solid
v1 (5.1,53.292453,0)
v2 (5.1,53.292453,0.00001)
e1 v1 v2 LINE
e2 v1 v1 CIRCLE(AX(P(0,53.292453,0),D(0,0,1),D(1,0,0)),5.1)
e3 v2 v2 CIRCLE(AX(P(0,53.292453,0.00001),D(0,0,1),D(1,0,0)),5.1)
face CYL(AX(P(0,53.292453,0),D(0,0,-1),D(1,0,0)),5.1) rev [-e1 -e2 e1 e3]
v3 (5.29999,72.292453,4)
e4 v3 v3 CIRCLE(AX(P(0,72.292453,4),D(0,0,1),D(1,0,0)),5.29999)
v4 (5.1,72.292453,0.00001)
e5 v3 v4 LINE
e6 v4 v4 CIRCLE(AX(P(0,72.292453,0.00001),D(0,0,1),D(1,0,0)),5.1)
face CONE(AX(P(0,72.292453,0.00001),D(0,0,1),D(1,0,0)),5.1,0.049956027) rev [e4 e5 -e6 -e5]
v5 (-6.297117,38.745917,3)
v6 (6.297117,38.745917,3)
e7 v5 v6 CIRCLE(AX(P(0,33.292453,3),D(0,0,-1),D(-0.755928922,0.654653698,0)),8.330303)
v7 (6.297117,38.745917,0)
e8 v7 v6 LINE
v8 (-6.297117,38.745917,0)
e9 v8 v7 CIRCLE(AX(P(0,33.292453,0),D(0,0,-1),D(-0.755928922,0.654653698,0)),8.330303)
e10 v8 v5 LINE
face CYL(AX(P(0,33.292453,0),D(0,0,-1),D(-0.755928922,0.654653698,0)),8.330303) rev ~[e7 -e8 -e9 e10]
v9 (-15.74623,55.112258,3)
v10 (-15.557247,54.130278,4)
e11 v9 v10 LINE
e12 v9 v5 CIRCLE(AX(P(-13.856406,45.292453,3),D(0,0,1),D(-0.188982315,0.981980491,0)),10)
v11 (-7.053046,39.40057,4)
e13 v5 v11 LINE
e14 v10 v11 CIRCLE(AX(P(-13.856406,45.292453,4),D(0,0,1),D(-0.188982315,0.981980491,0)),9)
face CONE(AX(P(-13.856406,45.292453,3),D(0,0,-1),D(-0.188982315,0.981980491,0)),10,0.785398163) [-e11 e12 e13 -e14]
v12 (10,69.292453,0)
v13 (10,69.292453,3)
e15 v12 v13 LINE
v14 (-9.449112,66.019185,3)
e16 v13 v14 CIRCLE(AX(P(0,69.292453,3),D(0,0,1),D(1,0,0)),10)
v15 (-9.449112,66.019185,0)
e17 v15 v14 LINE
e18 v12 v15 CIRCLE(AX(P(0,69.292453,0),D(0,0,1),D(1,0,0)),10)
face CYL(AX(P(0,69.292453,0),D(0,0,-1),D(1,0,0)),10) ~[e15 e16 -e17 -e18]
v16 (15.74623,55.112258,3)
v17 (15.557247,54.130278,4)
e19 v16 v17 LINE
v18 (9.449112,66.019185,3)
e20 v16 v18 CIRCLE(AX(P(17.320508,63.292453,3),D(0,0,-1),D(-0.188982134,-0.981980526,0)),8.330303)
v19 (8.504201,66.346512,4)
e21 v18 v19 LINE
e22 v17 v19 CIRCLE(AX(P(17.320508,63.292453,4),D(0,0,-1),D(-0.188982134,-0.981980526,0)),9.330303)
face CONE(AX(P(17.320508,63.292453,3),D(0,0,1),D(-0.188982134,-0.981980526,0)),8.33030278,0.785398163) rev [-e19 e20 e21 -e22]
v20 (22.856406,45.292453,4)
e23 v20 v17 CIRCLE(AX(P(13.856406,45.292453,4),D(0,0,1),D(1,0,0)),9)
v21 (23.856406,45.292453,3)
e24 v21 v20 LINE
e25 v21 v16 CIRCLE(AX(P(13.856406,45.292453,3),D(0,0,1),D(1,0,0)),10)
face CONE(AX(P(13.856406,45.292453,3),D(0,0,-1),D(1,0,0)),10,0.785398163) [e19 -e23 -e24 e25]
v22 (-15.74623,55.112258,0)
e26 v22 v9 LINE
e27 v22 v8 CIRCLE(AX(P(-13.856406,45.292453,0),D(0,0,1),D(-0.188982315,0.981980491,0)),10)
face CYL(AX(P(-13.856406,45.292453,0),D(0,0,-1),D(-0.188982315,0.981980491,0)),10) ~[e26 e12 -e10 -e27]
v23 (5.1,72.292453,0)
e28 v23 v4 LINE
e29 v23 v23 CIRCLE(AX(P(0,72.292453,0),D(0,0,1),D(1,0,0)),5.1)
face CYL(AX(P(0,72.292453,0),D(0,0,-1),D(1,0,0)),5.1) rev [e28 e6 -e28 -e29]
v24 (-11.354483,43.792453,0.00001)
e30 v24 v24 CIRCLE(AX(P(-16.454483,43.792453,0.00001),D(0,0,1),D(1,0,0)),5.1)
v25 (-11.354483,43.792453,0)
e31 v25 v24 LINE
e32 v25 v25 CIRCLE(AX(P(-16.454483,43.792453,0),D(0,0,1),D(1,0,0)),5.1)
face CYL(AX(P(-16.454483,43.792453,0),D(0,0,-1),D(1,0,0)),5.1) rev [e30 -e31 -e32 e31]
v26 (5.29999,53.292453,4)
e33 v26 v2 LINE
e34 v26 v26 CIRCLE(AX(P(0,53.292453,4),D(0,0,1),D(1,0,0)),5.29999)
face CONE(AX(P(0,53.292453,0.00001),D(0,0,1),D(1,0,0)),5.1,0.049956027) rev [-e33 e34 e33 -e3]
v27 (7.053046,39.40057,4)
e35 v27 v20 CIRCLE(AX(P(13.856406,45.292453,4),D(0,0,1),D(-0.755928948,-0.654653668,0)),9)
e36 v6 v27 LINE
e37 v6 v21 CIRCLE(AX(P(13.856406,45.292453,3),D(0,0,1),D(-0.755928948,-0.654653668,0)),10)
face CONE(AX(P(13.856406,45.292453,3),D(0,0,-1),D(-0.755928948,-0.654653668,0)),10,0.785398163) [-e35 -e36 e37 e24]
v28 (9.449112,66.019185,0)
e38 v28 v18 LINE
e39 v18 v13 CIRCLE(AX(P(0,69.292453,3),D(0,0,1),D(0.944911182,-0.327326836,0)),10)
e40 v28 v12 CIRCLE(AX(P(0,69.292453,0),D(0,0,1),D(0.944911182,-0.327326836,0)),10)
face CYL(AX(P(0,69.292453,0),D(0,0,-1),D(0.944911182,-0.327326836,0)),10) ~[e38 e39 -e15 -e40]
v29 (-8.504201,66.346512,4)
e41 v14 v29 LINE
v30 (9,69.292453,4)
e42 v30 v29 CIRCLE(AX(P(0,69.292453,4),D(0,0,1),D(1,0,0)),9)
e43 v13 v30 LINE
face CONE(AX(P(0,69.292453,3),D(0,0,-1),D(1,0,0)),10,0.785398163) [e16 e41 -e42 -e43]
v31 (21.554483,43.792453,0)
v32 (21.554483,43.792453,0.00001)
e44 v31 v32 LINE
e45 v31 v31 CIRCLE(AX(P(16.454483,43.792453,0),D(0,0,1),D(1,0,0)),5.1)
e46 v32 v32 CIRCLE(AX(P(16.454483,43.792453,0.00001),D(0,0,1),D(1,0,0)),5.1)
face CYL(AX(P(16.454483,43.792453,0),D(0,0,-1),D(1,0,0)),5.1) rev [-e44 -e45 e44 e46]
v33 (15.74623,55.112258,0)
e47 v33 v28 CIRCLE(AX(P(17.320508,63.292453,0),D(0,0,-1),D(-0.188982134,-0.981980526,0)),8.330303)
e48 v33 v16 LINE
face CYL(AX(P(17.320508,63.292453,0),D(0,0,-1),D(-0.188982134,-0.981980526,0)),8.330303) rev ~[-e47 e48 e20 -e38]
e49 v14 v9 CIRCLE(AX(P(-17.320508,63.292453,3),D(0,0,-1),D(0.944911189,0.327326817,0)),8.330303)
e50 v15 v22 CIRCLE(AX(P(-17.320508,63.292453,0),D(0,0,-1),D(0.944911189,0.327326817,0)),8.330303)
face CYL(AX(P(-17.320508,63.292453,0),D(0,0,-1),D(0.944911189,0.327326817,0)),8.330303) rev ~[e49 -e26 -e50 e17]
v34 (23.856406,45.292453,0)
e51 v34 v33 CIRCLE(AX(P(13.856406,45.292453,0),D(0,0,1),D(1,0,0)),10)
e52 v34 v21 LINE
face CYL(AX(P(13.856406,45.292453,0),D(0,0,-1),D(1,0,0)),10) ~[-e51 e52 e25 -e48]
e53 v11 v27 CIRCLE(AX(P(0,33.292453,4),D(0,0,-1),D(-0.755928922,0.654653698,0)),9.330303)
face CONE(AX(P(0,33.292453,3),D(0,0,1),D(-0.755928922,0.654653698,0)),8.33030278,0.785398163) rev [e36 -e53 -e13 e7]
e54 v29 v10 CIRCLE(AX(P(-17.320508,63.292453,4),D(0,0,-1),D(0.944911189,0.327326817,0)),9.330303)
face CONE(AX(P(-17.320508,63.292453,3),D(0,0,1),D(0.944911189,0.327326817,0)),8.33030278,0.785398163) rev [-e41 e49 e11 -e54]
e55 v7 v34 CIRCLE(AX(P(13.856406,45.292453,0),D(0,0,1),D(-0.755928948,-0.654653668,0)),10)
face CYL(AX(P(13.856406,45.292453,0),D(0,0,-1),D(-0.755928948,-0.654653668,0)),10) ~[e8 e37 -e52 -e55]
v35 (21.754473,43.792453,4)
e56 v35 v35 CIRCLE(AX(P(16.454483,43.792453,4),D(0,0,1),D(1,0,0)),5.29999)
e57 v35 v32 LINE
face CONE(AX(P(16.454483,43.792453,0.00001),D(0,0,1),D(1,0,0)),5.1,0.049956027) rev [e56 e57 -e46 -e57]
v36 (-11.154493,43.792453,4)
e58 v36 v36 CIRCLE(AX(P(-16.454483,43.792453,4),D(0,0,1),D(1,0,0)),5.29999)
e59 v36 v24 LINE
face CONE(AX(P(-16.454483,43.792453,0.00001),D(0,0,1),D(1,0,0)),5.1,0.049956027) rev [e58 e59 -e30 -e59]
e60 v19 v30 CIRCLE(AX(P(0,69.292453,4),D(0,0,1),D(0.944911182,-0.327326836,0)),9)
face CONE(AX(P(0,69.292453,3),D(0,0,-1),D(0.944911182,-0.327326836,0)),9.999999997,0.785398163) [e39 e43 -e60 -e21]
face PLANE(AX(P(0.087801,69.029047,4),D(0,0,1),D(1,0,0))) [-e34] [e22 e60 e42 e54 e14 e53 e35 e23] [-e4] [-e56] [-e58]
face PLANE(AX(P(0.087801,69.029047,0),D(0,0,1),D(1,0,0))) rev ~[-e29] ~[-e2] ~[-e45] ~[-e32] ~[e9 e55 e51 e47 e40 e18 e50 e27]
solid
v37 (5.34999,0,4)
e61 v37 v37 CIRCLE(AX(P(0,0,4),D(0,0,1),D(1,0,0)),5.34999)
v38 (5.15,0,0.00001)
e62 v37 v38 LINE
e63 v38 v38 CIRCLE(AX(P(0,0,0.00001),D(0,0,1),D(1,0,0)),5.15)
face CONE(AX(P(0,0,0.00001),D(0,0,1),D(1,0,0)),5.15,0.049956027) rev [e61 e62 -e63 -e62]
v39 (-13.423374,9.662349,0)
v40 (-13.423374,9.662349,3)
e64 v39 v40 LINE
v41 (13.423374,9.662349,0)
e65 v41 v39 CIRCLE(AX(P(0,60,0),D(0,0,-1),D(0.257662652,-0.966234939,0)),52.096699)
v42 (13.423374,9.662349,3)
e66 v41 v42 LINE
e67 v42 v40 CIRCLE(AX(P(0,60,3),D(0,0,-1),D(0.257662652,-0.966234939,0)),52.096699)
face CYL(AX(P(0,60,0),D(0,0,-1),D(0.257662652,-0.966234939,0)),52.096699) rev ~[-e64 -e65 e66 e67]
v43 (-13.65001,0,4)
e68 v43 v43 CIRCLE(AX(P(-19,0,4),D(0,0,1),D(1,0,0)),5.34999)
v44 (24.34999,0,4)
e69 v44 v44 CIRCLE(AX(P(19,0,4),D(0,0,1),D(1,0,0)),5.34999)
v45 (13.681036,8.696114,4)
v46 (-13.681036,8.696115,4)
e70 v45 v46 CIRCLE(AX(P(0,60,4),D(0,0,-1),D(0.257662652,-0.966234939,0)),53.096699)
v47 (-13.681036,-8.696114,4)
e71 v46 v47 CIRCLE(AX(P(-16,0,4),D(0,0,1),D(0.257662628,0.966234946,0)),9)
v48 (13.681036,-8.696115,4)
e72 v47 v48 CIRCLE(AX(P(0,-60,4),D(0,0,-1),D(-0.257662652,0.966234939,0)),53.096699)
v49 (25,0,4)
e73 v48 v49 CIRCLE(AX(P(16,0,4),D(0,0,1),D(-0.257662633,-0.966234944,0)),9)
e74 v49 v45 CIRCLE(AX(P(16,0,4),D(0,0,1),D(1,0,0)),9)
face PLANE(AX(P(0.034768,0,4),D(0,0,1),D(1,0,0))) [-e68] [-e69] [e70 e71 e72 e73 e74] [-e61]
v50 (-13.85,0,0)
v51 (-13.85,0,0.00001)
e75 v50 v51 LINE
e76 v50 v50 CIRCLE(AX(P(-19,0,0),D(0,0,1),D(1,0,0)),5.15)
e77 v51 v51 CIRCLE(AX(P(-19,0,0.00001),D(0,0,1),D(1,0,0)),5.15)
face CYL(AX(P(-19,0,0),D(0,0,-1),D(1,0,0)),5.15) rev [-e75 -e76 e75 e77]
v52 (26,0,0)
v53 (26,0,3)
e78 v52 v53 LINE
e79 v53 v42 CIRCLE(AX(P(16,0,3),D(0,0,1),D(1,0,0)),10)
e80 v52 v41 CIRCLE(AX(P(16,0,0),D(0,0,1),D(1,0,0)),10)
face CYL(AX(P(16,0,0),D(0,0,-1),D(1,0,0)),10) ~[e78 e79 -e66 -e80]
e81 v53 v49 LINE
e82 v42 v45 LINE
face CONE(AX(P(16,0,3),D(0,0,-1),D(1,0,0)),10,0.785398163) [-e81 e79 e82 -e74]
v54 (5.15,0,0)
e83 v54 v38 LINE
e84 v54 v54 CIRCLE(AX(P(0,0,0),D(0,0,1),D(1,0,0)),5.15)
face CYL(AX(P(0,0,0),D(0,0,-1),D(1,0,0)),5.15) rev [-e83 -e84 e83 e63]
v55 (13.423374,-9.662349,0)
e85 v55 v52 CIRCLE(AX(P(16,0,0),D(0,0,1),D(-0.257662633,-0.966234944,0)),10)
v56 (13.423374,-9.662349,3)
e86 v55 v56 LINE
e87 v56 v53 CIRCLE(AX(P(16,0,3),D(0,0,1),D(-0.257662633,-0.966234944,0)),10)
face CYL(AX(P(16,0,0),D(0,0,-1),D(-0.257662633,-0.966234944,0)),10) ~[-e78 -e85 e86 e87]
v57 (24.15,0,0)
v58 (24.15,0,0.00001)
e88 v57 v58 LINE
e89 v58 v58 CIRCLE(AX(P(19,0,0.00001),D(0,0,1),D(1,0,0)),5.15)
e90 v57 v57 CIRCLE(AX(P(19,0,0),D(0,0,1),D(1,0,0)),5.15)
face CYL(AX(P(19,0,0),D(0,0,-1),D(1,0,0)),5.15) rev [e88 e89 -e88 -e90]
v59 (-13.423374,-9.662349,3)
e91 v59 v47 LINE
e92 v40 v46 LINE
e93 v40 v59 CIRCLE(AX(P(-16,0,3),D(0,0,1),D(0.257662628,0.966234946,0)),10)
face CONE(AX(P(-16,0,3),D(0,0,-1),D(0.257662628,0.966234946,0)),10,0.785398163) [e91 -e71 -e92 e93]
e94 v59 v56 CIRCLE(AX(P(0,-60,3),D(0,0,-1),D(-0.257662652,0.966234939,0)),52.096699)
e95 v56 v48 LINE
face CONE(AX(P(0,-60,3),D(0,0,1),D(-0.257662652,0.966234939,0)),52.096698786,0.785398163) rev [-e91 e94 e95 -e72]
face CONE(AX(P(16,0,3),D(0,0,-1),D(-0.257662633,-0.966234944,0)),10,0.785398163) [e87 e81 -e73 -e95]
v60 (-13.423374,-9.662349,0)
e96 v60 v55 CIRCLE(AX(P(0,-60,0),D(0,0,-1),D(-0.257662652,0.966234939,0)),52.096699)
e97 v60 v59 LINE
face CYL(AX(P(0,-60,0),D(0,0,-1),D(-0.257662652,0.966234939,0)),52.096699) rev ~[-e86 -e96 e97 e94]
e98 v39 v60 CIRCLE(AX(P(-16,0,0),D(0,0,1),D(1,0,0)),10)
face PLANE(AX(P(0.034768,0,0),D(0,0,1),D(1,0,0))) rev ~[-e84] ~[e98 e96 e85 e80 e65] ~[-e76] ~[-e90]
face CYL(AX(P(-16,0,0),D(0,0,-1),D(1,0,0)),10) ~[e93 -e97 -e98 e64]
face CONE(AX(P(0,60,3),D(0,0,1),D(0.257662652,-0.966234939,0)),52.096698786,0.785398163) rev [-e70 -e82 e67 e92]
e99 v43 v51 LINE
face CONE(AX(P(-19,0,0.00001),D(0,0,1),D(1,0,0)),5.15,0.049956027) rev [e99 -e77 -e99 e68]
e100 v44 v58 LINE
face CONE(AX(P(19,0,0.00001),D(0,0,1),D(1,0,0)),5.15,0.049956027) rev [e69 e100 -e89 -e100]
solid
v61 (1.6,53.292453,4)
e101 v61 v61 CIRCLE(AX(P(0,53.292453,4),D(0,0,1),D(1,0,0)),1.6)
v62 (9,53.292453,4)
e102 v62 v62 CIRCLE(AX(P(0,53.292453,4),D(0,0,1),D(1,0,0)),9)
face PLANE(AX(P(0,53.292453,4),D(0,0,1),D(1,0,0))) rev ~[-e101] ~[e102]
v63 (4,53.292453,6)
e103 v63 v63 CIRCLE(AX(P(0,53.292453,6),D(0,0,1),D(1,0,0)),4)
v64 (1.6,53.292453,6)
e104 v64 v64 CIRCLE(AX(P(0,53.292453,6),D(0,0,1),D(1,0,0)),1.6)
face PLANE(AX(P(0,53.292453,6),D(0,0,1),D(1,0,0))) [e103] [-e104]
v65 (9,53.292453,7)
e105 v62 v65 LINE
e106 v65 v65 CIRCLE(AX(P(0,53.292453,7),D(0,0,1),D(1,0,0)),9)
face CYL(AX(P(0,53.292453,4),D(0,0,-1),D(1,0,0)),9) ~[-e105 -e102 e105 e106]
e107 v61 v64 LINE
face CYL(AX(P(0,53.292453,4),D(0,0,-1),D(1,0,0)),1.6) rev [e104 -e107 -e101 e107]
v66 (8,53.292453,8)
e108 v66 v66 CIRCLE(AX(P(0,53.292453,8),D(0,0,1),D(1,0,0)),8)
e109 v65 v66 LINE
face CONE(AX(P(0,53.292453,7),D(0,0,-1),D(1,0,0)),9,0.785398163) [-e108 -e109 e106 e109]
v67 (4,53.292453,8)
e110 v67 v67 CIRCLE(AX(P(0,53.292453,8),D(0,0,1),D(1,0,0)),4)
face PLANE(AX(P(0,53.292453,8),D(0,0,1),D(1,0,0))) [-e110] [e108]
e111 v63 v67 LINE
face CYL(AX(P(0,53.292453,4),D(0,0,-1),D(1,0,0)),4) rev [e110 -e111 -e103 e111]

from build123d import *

# Parameters (mm, degrees)
F0_R       = 5.15
F1_DEPTH   = 4
F2_SIZE    = 1
F3_R       = 5.1
F4_DEPTH   = 4
F5_SIZE    = 1
F6_SIZE2   = 3.99999
F6_SIZE    = 0.19999
F6_2_SIZE2 = 3.99999
F6_2_SIZE  = 0.19999
F7_R       = 9
F7_R_2     = 5.29999
F7_R_3     = 4
F8_DEPTH   = 4
F7_R_4     = 1.6
F9_DEPTH   = 2
F10_SIZE   = 1


# Not quite as in the source:
# - a fillet or chamfer is up to 0.001 mm smaller than in the source, because OpenCascade refuses the exact size
# - a feature names something its author has since deleted; it is built from what else it names


with BuildPart() as f1:
    # F0 (on Top) → F1 (new body)
    with BuildSketch(Plane.XY):
        with BuildLine():
            ThreePointArc((-13.4233737216, 9.6623494566), (-8.0701115145, 6.0923614968), (-6, 0))
            ThreePointArc((-6, 0), (-8.0701114601, -6.092361426), (-13.4233735489, -9.6623494106))
            ThreePointArc((-13.4233735489, -9.6623494106), (6.05e-08, -7.903301215), (13.4233736658, -9.6623494417))
            ThreePointArc((13.4233736658, -9.6623494417), (6, -6.16e-08), (13.4233735467, 9.66234941))
            ThreePointArc((13.4233735467, 9.66234941), (-9.05e-08, 7.903301215), (-13.4233737216, 9.6623494566))
        make_face()
        Circle(F0_R, mode=Mode.SUBTRACT)
        with BuildLine():
            ThreePointArc((-13.4233735489, -9.6623494106), (-8.0701114601, -6.092361426), (-6, 0))
            ThreePointArc((-6, 0), (-8.0701115145, 6.0923614968), (-13.4233737216, 9.6623494566))
            ThreePointArc((-13.4233737216, 9.6623494566), (-26, -8.94e-08), (-13.4233735489, -9.6623494106))
        make_face()
        with Locations((-19, 0)):
            Circle(F0_R, mode=Mode.SUBTRACT)
        with BuildLine():
            ThreePointArc((26, 0), (22.0923614251, 7.9298885406), (13.4233735467, 9.66234941))
            ThreePointArc((13.4233735467, 9.66234941), (6, -6.16e-08), (13.4233736658, -9.6623494417))
            ThreePointArc((13.4233736658, -9.6623494417), (22.0923614739, -7.929888503), (26, 0))
        make_face()
        with Locations((19, 0)):
            Circle(F0_R, mode=Mode.SUBTRACT)
    extrude(amount=F1_DEPTH)

    # F2
    f2_edges = [f1.edges().sort_by_distance(p)[0] for p in [
        (0, -7.903301, 4),
    ]]
    chamfer(f2_edges, length=F2_SIZE)

    # F6 (size 0.2 and 4 in the source; OpenCascade refuses exactly that, so slightly less here)
    f6_edges = [f1.edges().sort_by_distance(p)[0] for p in [
        (-24.15, 0, 4),
        (13.85, 0, 4),
        (-5.15, 0, 4),
    ]]
    f6_side = f1.faces().sort_by_distance((0, -6.371888, 4))[0]
    chamfer(f6_edges, length=F6_SIZE, length2=F6_SIZE2, reference=f6_side)


with BuildPart() as f4:
    # F3 (on Top) → F4 (new body)
    with BuildSketch(Plane.XY):
        with BuildLine():
            ThreePointArc((9.4491118238, 66.0191849315), (9.8613162975, 67.632802458), (10, 69.292453289))
            ThreePointArc((10, 69.292453289), (-1.6596509098, 79.1537695733), (-9.4491117716, 66.0191847805))
            ThreePointArc((-9.4491117716, 66.0191847805), (7.99e-08, 59.292453289), (9.4491118238, 66.0191849315))
        make_face()
        with Locations((0, 72.292453289)):
            Circle(F3_R, mode=Mode.SUBTRACT)
        with BuildLine():
            ThreePointArc((9.4491118238, 66.0191849315), (7.99e-08, 59.292453289), (-9.4491117716, 66.0191847805))
            ThreePointArc((-9.4491117716, 66.0191847805), (-10.1062544883, 59.1273014814), (-15.7462296119, 55.1122581983))
            ThreePointArc((-15.7462296119, 55.1122581983), (-7.4884488411, 53.0027785582), (-3.8564064606, 45.292453289))
            ThreePointArc((-3.8564064606, 45.292453289), (-4.4864305642, 41.7990950622), (-6.2971168007, 38.7459168125))
            ThreePointArc((-6.2971168007, 38.7459168125), (1.374e-07, 41.6227560689), (6.2971169806, 38.7459166047))
            ThreePointArc((6.2971169806, 38.7459166047), (5.1961526478, 50.2924536788), (15.74622968, 55.1122581852))
            ThreePointArc((15.74622968, 55.1122581852), (10.1062544657, 59.1273015205), (9.4491118238, 66.0191849315))
        make_face()
        with Locations((0, 53.292453289)):
            Circle(F3_R, mode=Mode.SUBTRACT)
        with BuildLine():
            ThreePointArc((23.8564064606, 45.292453289), (21.5667317518, 51.6604108818), (15.74622968, 55.1122581852))
            ThreePointArc((15.74622968, 55.1122581852), (5.1961526478, 50.2924536788), (6.2971169806, 38.7459166047))
            ThreePointArc((6.2971169806, 38.7459166047), (17.3497648161, 35.9224774406), (23.8564064606, 45.292453289))
        make_face()
        with Locations((16.4544826719, 43.792453289)):
            Circle(F3_R, mode=Mode.SUBTRACT)
        with BuildLine():
            ThreePointArc((-3.8564064606, 45.292453289), (-7.4884488411, 53.0027785582), (-15.7462296119, 55.1122581983))
            ThreePointArc((-15.7462296119, 55.1122581983), (-22.516660222, 40.2924528103), (-6.2971168007, 38.7459168125))
            ThreePointArc((-6.2971168007, 38.7459168125), (-4.4864305642, 41.7990950622), (-3.8564064606, 45.292453289))
        make_face()
        with Locations((-16.4544826719, 43.792453289)):
            Circle(F3_R, mode=Mode.SUBTRACT)
    extrude(amount=F4_DEPTH)

    # F5
    f5_edges = [f4.edges().sort_by_distance(p)[0] for p in [
        (-22.51666, 40.292453, 4),
    ]]
    chamfer(f5_edges, length=F5_SIZE)

    # F6#2 (size 0.2 and 4 in the source; OpenCascade refuses exactly that, so slightly less here)
    f6_2_edges = [f4.edges().sort_by_distance(p)[0] for p in [
        (-21.554483, 43.792453, 4),
        (-5.1, 53.292453, 4),
        (-5.1, 72.292453, 4),
        (11.354483, 43.792453, 4),
    ]]
    f6_2_side = f4.faces().sort_by_distance((-21.113025, 41.102842, 4))[0]
    chamfer(f6_2_edges, length=F6_2_SIZE, length2=F6_2_SIZE2, reference=f6_2_side)


with BuildPart() as f8:
    # F7 (on face) → F8 (new body)
    with BuildSketch(Plane.XY.offset(4)):
        with Locations((0, 53.292453289)):
            Circle(F7_R)
        with Locations((0, 53.292453289)):
            Circle(F7_R_2, mode=Mode.SUBTRACT)
        with Locations((0, 53.292453289)):
            Circle(F7_R_2)
        with Locations((0, 53.292453289)):
            Circle(F7_R_3, mode=Mode.SUBTRACT)
    extrude(amount=F8_DEPTH)

    # F7 (on face) → F9 (join)
    with BuildSketch(Plane.XY.offset(4)):
        with Locations((0, 53.292453289)):
            Circle(F7_R_3)
        with Locations((0, 53.292453289)):
            Circle(F7_R_4, mode=Mode.SUBTRACT)
    extrude(amount=F9_DEPTH)

    # F10
    f10_edges = [f8.edges().sort_by_distance(p)[0] for p in [
        (-9, 53.292453, 8),
    ]]
    chamfer(f10_edges, length=F10_SIZE)


solid = Compound([f1.part, f4.part, f8.part])
